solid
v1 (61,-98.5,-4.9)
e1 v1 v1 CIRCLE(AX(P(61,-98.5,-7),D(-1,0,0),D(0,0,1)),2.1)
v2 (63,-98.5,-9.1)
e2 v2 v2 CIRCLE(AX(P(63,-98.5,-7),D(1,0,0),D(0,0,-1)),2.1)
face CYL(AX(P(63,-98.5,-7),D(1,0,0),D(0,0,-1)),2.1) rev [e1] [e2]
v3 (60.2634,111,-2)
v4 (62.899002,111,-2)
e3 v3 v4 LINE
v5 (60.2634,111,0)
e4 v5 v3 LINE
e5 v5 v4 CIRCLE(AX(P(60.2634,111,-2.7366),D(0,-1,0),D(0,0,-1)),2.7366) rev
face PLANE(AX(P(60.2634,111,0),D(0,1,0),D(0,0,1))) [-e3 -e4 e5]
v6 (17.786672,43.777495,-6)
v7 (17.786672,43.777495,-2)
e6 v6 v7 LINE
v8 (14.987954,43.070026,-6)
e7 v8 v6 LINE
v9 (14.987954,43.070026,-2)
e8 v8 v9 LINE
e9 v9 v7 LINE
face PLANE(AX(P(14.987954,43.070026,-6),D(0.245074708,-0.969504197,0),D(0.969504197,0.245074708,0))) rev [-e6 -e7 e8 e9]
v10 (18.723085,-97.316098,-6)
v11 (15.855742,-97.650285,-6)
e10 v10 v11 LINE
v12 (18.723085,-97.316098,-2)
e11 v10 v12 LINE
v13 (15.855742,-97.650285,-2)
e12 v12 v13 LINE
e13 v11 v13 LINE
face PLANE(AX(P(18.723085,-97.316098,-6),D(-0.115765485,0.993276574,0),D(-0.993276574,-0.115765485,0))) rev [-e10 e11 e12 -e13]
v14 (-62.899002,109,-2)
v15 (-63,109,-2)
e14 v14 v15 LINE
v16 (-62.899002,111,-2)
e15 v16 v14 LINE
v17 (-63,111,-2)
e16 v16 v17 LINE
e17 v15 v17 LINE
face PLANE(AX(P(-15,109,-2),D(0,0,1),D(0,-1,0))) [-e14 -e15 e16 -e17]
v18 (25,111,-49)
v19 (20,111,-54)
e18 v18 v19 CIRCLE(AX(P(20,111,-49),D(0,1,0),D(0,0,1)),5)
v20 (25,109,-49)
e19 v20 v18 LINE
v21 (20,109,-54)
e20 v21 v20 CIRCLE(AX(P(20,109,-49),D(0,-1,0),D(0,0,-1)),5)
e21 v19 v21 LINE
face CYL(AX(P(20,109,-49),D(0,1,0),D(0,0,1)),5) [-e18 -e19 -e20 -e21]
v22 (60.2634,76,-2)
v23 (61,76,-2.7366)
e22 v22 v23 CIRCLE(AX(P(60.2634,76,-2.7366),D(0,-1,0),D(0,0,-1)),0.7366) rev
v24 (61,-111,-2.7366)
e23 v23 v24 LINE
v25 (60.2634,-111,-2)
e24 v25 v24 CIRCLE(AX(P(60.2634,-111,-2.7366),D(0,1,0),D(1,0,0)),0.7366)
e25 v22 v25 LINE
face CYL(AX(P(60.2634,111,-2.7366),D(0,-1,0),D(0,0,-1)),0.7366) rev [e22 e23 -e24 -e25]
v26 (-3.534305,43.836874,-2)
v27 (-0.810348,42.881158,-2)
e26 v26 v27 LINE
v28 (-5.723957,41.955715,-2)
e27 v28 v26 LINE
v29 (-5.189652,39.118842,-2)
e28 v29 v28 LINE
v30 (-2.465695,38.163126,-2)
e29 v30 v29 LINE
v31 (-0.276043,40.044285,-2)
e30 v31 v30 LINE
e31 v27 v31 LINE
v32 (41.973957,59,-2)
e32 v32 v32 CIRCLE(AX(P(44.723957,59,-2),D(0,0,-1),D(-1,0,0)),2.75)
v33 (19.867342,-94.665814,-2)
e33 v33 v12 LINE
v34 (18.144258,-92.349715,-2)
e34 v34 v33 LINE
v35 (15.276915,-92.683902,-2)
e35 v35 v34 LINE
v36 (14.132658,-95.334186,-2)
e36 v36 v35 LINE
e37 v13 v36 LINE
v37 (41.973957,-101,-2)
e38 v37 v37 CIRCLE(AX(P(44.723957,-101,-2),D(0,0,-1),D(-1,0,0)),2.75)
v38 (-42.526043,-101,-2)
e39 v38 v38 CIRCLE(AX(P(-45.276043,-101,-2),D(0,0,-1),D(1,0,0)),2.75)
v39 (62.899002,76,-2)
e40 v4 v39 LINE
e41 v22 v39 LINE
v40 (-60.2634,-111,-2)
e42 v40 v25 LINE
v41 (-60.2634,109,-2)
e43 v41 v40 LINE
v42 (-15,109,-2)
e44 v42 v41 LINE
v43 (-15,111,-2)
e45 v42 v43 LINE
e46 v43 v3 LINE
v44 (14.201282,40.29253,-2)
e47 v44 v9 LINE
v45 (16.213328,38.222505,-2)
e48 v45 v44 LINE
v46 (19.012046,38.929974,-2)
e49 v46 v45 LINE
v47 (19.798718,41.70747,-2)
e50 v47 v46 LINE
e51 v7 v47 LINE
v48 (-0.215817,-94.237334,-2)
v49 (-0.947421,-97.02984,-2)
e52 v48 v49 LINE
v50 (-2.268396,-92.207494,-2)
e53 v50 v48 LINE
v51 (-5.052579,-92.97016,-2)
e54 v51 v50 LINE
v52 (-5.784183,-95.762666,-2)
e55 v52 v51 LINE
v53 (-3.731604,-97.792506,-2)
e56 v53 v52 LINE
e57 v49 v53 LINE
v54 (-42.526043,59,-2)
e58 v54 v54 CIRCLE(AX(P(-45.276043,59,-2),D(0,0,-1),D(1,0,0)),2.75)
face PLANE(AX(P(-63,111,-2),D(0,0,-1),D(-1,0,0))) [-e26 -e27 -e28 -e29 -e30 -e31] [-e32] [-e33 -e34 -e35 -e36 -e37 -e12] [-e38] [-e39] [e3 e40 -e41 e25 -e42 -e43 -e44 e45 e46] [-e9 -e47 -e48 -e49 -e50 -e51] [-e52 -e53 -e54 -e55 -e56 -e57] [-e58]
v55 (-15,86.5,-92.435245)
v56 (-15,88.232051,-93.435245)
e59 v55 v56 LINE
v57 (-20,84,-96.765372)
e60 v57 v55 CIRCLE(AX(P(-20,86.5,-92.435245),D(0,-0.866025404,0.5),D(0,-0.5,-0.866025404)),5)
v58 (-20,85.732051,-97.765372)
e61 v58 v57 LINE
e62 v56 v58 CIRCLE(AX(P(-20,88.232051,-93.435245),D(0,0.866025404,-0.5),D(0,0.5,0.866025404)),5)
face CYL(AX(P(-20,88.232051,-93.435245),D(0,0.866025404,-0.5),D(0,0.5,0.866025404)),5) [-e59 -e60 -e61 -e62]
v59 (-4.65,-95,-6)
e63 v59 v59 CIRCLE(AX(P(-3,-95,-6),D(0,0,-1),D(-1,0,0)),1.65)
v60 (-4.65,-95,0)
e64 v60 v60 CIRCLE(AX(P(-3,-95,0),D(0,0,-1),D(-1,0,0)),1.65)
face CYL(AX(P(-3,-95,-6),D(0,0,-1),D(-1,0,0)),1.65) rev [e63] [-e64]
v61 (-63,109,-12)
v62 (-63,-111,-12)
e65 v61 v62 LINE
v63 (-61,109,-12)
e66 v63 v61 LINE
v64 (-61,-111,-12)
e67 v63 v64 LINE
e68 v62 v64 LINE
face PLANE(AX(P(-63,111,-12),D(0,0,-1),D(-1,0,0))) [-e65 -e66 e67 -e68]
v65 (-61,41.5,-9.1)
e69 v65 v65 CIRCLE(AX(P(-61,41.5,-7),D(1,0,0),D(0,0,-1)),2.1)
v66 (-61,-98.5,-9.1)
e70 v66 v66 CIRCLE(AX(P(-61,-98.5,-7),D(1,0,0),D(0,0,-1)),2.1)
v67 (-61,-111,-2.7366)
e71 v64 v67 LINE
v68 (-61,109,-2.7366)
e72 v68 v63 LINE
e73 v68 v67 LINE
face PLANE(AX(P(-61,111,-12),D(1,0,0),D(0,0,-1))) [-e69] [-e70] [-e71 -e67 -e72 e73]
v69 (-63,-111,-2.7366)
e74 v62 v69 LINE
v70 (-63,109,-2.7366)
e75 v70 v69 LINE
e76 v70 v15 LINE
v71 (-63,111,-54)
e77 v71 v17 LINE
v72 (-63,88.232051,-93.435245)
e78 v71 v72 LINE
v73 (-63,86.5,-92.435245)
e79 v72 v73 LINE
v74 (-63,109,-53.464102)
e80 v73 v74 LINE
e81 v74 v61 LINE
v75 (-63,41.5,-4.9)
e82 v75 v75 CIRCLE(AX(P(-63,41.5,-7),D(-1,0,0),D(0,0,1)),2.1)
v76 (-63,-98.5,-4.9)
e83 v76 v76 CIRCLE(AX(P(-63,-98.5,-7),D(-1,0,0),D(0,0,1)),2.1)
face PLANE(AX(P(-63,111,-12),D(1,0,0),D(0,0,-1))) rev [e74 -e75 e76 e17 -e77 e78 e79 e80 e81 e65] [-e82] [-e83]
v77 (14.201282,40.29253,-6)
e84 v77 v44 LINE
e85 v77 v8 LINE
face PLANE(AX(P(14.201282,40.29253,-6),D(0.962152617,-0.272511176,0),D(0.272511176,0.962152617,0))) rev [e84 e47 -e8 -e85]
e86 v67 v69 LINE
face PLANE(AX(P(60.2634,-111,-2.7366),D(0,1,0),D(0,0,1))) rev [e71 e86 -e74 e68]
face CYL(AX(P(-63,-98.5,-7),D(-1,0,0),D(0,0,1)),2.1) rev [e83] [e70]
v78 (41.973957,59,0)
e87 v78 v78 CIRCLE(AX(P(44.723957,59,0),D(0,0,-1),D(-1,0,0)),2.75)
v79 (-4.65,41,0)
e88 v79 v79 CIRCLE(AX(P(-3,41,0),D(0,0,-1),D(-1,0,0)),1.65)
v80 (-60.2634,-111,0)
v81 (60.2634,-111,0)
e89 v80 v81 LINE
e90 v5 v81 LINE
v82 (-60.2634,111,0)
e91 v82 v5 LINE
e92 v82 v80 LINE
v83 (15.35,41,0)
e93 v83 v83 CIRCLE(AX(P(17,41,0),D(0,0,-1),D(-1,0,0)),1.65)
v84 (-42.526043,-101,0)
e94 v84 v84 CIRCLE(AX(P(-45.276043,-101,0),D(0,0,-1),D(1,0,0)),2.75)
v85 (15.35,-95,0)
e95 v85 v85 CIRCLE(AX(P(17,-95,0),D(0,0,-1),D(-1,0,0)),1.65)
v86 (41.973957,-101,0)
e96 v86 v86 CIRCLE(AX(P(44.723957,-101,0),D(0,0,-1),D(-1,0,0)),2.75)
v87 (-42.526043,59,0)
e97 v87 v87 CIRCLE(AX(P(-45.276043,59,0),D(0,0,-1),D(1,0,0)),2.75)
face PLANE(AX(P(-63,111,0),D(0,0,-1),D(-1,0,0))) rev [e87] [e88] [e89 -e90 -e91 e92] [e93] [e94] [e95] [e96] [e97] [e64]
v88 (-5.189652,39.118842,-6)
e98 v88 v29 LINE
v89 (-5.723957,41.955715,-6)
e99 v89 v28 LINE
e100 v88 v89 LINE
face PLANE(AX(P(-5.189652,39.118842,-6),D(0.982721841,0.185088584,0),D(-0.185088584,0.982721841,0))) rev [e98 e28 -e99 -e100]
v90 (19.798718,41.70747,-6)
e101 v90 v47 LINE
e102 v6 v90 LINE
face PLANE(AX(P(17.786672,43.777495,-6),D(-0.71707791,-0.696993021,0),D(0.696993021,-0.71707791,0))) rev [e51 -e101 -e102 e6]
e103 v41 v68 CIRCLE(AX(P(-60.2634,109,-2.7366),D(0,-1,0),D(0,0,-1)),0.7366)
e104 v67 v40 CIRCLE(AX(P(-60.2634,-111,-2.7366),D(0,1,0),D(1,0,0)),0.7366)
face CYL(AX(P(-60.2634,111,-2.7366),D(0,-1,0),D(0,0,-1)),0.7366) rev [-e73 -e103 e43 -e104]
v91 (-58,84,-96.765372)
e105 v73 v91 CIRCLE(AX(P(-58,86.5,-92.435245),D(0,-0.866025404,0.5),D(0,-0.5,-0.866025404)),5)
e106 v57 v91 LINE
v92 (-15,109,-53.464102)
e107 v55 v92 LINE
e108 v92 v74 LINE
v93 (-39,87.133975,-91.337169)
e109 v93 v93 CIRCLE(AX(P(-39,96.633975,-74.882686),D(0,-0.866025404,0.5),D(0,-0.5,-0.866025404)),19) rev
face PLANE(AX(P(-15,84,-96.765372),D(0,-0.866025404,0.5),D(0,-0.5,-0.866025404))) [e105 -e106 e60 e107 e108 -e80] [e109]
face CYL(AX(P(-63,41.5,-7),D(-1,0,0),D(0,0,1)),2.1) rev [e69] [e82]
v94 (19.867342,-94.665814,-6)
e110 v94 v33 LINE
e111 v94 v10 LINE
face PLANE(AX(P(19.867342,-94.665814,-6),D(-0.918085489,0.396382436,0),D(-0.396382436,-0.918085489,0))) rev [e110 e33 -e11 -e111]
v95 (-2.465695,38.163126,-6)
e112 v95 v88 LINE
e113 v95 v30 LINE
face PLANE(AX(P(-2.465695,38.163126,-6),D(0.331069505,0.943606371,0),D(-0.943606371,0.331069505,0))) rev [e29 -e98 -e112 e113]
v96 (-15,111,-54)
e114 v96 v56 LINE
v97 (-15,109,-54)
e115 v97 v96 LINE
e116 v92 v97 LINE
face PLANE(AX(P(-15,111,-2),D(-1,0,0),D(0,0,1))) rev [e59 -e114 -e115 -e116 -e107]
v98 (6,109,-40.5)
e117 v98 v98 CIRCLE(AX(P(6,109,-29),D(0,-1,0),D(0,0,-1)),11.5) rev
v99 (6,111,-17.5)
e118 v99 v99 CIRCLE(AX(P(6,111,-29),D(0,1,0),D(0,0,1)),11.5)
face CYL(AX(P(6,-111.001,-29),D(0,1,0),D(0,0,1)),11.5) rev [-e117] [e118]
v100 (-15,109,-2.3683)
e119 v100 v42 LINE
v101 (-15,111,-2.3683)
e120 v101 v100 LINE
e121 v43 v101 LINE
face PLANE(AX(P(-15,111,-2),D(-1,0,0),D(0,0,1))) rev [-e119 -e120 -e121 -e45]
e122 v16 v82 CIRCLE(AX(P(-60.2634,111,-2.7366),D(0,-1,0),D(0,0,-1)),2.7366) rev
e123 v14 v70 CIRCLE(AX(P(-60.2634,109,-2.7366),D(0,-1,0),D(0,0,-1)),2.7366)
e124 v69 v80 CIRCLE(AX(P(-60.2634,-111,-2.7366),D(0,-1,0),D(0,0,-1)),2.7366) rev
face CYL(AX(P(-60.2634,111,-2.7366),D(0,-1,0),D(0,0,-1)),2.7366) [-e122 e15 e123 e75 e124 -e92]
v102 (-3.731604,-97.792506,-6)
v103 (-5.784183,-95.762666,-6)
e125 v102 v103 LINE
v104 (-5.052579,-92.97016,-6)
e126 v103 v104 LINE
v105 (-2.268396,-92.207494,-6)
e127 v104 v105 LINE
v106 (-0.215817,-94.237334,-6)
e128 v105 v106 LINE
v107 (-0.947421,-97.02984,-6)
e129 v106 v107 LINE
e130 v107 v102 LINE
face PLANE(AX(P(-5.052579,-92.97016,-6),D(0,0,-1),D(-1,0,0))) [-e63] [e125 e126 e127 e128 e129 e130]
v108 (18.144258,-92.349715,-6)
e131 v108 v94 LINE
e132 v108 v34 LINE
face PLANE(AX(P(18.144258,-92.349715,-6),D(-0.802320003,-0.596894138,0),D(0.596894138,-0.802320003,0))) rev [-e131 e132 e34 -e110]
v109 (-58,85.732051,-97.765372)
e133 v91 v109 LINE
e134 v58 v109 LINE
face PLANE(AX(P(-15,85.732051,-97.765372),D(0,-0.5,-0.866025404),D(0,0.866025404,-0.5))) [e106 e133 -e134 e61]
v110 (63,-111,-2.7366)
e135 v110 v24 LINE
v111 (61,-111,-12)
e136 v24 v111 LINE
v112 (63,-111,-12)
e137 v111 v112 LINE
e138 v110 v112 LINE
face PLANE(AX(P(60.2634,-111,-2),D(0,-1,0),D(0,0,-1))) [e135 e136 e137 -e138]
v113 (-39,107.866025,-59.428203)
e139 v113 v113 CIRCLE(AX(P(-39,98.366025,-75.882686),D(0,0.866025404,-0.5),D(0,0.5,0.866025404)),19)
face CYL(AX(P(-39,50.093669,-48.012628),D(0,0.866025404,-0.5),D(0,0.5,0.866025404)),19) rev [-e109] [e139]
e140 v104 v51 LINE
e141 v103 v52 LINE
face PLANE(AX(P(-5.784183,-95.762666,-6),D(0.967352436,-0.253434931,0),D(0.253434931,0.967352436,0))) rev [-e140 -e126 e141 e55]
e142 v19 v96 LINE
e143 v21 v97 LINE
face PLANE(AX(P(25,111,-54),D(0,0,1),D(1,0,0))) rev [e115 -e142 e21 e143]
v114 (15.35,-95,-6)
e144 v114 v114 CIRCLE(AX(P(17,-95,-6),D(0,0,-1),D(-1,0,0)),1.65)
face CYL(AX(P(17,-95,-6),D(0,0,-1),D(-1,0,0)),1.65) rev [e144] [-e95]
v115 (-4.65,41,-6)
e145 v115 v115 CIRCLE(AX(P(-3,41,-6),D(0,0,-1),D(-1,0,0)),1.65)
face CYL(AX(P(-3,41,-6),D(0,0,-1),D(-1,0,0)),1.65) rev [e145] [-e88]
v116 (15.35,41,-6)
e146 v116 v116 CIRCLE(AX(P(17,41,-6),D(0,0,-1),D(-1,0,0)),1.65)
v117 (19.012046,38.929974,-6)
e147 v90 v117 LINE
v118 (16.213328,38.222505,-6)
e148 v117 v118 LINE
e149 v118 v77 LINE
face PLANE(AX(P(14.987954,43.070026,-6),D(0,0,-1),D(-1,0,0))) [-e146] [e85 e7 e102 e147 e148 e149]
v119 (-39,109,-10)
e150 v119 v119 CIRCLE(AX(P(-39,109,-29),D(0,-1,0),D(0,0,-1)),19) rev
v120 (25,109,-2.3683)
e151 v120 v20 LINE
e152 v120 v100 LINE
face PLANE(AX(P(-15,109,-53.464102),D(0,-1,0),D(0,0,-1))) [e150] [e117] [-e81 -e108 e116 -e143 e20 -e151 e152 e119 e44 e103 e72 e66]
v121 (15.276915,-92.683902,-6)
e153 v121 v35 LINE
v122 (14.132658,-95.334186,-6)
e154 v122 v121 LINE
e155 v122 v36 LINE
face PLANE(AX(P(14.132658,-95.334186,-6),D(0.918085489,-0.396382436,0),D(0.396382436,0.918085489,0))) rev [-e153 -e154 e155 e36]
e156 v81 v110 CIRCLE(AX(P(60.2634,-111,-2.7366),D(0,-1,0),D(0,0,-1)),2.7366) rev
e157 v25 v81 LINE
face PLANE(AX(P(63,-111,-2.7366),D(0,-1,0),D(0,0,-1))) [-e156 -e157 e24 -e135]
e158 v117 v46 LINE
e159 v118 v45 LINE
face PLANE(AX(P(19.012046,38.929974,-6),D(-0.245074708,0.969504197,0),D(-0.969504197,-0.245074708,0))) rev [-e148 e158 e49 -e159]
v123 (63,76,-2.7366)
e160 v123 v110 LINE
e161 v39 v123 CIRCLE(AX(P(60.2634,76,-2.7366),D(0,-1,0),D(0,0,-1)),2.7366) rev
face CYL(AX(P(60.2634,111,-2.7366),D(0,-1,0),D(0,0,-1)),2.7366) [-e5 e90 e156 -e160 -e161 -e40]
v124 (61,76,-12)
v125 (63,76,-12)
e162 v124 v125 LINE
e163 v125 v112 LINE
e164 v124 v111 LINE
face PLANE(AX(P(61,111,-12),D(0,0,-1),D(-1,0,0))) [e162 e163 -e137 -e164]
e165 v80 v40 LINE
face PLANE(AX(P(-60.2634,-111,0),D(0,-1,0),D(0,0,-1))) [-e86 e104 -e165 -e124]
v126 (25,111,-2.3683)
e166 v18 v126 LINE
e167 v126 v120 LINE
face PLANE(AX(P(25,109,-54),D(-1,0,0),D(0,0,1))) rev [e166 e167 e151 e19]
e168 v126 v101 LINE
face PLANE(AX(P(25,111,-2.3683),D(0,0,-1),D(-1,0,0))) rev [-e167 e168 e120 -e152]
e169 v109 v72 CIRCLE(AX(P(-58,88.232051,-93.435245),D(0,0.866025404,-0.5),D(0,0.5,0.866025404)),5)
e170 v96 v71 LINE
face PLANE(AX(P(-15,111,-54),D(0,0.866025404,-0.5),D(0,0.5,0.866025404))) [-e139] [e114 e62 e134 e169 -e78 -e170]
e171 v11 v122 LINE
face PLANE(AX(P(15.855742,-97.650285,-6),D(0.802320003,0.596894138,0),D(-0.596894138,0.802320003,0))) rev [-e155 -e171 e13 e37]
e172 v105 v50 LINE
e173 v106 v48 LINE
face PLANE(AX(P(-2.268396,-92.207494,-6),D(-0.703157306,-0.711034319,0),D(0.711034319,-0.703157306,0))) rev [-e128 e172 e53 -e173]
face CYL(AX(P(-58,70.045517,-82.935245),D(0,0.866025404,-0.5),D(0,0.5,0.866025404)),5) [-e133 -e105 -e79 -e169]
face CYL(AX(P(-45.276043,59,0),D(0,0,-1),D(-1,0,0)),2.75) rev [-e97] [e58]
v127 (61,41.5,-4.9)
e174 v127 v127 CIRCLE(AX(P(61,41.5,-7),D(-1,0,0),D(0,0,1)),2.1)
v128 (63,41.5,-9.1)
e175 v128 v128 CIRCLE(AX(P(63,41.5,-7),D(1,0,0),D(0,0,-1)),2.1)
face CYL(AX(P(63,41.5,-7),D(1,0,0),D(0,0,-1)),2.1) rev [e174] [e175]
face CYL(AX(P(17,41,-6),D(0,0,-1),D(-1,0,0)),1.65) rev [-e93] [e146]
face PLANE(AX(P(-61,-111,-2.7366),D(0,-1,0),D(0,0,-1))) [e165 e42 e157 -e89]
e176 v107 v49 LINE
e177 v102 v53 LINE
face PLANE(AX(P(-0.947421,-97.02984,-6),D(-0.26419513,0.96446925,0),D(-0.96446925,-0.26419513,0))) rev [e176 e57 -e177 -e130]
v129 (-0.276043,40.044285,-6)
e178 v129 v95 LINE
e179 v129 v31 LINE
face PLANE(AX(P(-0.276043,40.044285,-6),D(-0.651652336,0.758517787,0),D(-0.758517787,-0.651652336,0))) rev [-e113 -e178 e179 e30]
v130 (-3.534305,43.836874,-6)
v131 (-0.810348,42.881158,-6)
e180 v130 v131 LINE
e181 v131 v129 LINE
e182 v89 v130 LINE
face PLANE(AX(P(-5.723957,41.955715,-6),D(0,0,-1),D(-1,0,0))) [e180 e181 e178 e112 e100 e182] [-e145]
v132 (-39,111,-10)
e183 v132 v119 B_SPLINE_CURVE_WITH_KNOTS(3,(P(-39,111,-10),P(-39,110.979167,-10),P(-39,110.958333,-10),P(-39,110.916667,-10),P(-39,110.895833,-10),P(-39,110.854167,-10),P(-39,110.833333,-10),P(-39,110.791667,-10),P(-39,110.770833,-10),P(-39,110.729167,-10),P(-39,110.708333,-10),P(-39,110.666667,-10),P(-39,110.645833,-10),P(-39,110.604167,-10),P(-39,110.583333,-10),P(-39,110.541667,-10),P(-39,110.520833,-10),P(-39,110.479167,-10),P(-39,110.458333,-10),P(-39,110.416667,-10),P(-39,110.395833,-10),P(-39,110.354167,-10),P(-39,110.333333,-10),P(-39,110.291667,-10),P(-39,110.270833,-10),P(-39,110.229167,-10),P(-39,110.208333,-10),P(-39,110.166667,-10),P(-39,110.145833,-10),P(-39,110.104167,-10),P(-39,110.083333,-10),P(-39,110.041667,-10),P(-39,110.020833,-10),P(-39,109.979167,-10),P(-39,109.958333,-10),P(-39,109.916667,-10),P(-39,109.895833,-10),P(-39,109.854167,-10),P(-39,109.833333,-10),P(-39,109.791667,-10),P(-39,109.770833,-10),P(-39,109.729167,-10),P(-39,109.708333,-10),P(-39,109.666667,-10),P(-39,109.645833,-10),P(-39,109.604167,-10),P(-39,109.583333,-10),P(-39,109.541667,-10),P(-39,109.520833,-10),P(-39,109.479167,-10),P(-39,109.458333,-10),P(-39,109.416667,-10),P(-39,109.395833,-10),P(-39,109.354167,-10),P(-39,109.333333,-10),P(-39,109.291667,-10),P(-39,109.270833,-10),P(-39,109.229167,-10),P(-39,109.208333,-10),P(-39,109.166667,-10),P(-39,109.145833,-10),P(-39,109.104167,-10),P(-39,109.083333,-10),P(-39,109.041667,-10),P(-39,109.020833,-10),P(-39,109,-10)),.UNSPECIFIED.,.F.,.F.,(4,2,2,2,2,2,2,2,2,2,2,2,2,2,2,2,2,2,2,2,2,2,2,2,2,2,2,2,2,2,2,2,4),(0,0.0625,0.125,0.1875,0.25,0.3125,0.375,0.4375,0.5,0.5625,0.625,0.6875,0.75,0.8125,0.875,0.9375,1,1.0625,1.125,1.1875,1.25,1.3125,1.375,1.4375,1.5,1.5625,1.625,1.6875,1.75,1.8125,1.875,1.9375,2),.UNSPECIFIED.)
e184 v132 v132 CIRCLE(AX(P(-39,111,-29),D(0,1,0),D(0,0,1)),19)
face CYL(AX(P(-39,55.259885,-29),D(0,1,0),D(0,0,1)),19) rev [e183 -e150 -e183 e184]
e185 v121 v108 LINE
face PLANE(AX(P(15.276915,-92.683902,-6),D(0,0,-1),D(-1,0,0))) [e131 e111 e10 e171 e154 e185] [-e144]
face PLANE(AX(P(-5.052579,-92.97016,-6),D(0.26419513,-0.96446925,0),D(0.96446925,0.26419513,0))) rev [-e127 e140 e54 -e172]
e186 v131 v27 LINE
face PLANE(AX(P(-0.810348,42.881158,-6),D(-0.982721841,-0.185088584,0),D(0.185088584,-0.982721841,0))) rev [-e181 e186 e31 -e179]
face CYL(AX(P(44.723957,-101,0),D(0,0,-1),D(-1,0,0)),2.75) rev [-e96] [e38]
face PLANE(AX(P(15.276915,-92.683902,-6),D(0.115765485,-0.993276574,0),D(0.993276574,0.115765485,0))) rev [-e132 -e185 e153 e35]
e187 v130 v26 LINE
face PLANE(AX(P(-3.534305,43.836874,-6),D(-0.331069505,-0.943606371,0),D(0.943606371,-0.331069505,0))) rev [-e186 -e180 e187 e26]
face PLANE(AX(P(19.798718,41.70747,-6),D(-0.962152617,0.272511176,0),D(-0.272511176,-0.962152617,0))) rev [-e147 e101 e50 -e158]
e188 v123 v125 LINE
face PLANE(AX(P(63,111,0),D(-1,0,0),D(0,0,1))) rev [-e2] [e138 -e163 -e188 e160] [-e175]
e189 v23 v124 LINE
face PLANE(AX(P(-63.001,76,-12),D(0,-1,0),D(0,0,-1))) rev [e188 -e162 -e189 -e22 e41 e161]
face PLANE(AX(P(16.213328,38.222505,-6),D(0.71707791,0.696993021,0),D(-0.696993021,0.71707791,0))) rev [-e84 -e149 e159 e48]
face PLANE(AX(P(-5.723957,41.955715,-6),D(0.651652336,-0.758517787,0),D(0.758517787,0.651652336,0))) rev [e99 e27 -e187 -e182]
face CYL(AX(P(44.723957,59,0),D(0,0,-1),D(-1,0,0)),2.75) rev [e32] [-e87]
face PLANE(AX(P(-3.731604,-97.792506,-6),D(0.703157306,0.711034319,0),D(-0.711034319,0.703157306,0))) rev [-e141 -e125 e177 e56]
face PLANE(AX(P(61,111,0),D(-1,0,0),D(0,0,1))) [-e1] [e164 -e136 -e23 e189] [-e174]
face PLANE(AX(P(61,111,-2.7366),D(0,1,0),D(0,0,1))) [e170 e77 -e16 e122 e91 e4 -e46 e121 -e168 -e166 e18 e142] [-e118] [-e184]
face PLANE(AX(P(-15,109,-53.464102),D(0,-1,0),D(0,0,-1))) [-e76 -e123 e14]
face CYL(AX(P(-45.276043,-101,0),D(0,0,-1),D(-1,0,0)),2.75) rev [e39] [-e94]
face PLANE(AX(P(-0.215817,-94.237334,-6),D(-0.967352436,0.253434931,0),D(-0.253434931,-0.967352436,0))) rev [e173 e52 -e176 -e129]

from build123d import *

# Parameters (mm, degrees)
SM_BASE_FLANGE_1_DEPTH = 111
CUT_EXTRUDE_1_REACH    = 170.348
SKETCH_3_W             = 10
SKETCH_3_H             = 35
EXTRUDE_1_DEPTH        = 4
M4X0_7_1_D             = 3.3
SKETCH_8_R             = 2.75
CUT_EXTRUDE_2_DEPTH    = 129.023435355
M5X0_8_1_AT_2_COUNT    = 2
M5X0_8_1_AT_2_PITCH    = 140
EXTRUDE_2_DEPTH        = 48
SKETCH_12_R            = 19
CUT_EXTRUDE_3_DEPTH    = 2
SKETCH_13_R            = 19
CUT_EXTRUDE_4_DEPTH    = 2
FILLET_1_R             = 5
SKETCH_14_W            = 51.6317
SKETCH_14_H            = 2
EXTRUDE_3_DEPTH        = 40
CUT_EXTRUDE_5_REACH    = 252.621
SKETCH_15_R            = 11.5
FILLET_2_R             = 5


# Sheet-metal steps are written as plain solids
with BuildPart() as part:
    # Sketch 1 → 基体-法兰1 (new, symmetric)
    with BuildSketch(Plane(origin=(0, 0, 0), x_dir=(1, 0, 0), z_dir=(0, 1, 0))):
        with BuildLine():
            Line((-63, 12), (-63, 2.7366))
            ThreePointArc((-63, 2.7366), (-62.198468417, 0.801531583), (-60.2634, 0))
            Line((-60.2634, 0), (60.2634, 0))
            ThreePointArc((60.2634, 0), (62.198468417, 0.801531583), (63, 2.7366))
            Line((63, 2.7366), (63, 12))
            Line((63, 12), (61, 12))
            Line((61, 12), (61, 2.7366))
            ThreePointArc((61, 2.7366), (60.784254855, 2.215745145), (60.2634, 2))
            Line((60.2634, 2), (-60.2634, 2))
            ThreePointArc((-60.2634, 2), (-60.784254855, 2.215745145), (-61, 2.7366))
            Line((-61, 2.7366), (-61, 12))
            Line((-61, 12), (-63, 12))
        make_face()
    extrude(amount=SM_BASE_FLANGE_1_DEPTH, both=True)

    # 草图3 → 切除-拉伸1 (cut, up to next)
    with BuildSketch(Plane(origin=(63, 0, 0), x_dir=(0, 0, -1), z_dir=(1, 0, 0)), mode=Mode.PRIVATE) as cut_extrude_1_sk1:
        with Locations((7, 93.5)):
            Rectangle(SKETCH_3_W, SKETCH_3_H)
    cut_extrude_1_tool1 = extrude(cut_extrude_1_sk1.sketch, amount=-CUT_EXTRUDE_1_REACH, mode=Mode.PRIVATE) & part.part
    add(cut_extrude_1_tool1.solids().sort_by_distance((63, 93.5, -7))[0], mode=Mode.SUBTRACT)

    # 草图4 → 凸台-拉伸1 (add)
    with BuildSketch(Plane(origin=(0, 0, -2), x_dir=(-1, 0, 0), z_dir=(0, 0, -1))):
        Polygon((-14.987954458, 43.07002562), (-17.786672003, 43.777495363), (-19.798717545, 41.707469743), (-19.012045542, 38.92997438), (-16.213327997, 38.222504637), (-14.201282455, 40.292530257), align=None)
        Polygon((5.723956961, 41.955715338), (3.534304719, 43.836873596), (0.810347758, 42.881158258), (0.276043039, 40.044284662), (2.465695281, 38.163126404), (5.189652242, 39.118841742), align=None)
        Polygon((-15.276915043, -92.683901651), (-18.14425753, -92.34971548), (-19.867342487, -94.665813829), (-18.723084957, -97.316098349), (-15.85574247, -97.65028452), (-14.132657513, -95.334186171), align=None)
        Polygon((5.052579277, -92.9701597), (2.268396373, -92.207494053), (0.215817096, -94.237334353), (0.947420723, -97.0298403), (3.731603627, -97.792505947), (5.784182904, -95.762665647), align=None)
    extrude(amount=EXTRUDE_1_DEPTH)

    # M4x0.7 螺纹孔1 (through all)
    with Locations(Plane(origin=(0, 0, -6), x_dir=(-1, 0, 0), z_dir=(0, 0, -1))):
        with Locations((-17, 41), (3, 41), (-17, -95), (3, -95)):
            Hole(M4X0_7_1_D / 2)

    # 草图8 → 切除-拉伸2 (cut, through all)
    with BuildSketch(Plane(origin=(0, 0, -2), x_dir=(-1, 0, 0), z_dir=(0, 0, -1))):
        with Locations((-44.723956961, 59)):
            Circle(SKETCH_8_R)
        with Locations(Location((45.276043039, 59, 0), (0, 0, 180))):
            Circle(SKETCH_8_R)
        with Locations((-44.723956961, -101)):
            Circle(SKETCH_8_R)
        with Locations(Location((45.276043039, -101, 0), (0, 0, 180))):
            Circle(SKETCH_8_R)
    extrude(amount=-CUT_EXTRUDE_2_DEPTH, mode=Mode.SUBTRACT)

    # 草图9 → M5x0.8 螺纹孔1 (revolve, cut)
    with BuildSketch(Plane(origin=(63, -98.5, -7), x_dir=(0, 0, -1), z_dir=(0, 1, 0))):
        Polygon((0, 0), (0, 13.6618073), (2.1, 12.4), (2.1, 0), align=None)
    m5x0_8_1 = revolve(axis=Axis((69.35, -98.5, -7), (-1, 0, 0)), mode=Mode.SUBTRACT)

    # M5x0.8 螺纹孔1 at 2: M5x0.8 螺纹孔1 ×2
    with Locations(*[(0, i * M5X0_8_1_AT_2_PITCH, 0) for i in range(1, M5X0_8_1_AT_2_COUNT)]):
        add(m5x0_8_1, mode=Mode.SUBTRACT)

    # 镜向1: M5x0.8 螺纹孔1 across plane
    add(m5x0_8_1.mirror(Plane(origin=(0, 0, 0), x_dir=(0, 0, 1), z_dir=(1, 0, 0))), mode=Mode.SUBTRACT)

    # 镜向1 copy 1 sketch → 镜向1 copy 1 (revolve, cut)
    with BuildSketch(Plane(origin=(-63, 41.5, -7), x_dir=(0, 0, -1), z_dir=(0, 1, 0))):
        Polygon((0, 0), (0, -13.6618073), (2.1, -12.4), (2.1, 0), align=None)
    revolve(axis=Axis((-69.35, 41.5, -7), (-1, 0, 0)), mode=Mode.SUBTRACT)

    # 草图11 → 凸台-拉伸2 (add)
    with BuildSketch(Plane.ZY.offset(63)):
        Polygon((-2, 111), (-54, 111), (-97.765371804, 85.732050808), (-96.765371804, 84), (-53.464101615, 109), (-2, 109), align=None)
    extrude(amount=-EXTRUDE_2_DEPTH)

    # 草图12 → 切除-拉伸3 (cut)
    with BuildSketch(Plane(origin=(0, 111, 0), x_dir=(1, 0, 0), z_dir=(0, 1, 0))):
        with Locations(Location((-39, 29, 0), (0, 0, 270))):
            Circle(SKETCH_12_R)
    extrude(amount=-CUT_EXTRUDE_3_DEPTH, mode=Mode.SUBTRACT)

    # 草图13 → 切除-拉伸4 (cut)
    with BuildSketch(Plane(origin=(0, 106.632685902, -61.56440991), x_dir=(1, 0, 0), z_dir=(0, 0.8660254037844386, -0.5000000000000001))):
        with Locations(Location((-39, 16.533320997, 0), (0, 0, 270))):
            Circle(SKETCH_13_R)
    extrude(amount=-CUT_EXTRUDE_4_DEPTH, mode=Mode.SUBTRACT)

    # 圆角1
    fillet_1_edges = [part.edges().sort_by_distance(p)[0] for p in [
        (-63, 84.866025404, -97.265371804),
        (-15, 84.866025404, -97.265371804),
    ]]
    fillet(fillet_1_edges, radius=FILLET_1_R)

    # 草图14 → 凸台-拉伸3 (add)
    with BuildSketch(Plane(origin=(-15, 0, 0), x_dir=(0, 0, -1), z_dir=(1, 0, 0))):
        with Locations((28.18415, 110)):
            Rectangle(SKETCH_14_W, SKETCH_14_H)
    extrude(amount=EXTRUDE_3_DEPTH)

    # 草图15 → 切除-拉伸5 (cut, up to next)
    with BuildSketch(Plane(origin=(0, 111, 0), x_dir=(1, 0, 0), z_dir=(0, 1, 0)), mode=Mode.PRIVATE) as cut_extrude_5_sk1:
        with Locations(Location((6, 29, 0), (0, 0, 270))):
            Circle(SKETCH_15_R)
    cut_extrude_5_tool1 = extrude(cut_extrude_5_sk1.sketch, amount=-CUT_EXTRUDE_5_REACH, mode=Mode.PRIVATE) & part.part
    add(cut_extrude_5_tool1.solids().sort_by_distance((6, 111, -29))[0], mode=Mode.SUBTRACT)

    # 圆角2
    fillet_2_edges = [part.edges().sort_by_distance(p)[0] for p in [
        (25, 110, -54),
    ]]
    fillet(fillet_2_edges, radius=FILLET_2_R)


solid = part.part
